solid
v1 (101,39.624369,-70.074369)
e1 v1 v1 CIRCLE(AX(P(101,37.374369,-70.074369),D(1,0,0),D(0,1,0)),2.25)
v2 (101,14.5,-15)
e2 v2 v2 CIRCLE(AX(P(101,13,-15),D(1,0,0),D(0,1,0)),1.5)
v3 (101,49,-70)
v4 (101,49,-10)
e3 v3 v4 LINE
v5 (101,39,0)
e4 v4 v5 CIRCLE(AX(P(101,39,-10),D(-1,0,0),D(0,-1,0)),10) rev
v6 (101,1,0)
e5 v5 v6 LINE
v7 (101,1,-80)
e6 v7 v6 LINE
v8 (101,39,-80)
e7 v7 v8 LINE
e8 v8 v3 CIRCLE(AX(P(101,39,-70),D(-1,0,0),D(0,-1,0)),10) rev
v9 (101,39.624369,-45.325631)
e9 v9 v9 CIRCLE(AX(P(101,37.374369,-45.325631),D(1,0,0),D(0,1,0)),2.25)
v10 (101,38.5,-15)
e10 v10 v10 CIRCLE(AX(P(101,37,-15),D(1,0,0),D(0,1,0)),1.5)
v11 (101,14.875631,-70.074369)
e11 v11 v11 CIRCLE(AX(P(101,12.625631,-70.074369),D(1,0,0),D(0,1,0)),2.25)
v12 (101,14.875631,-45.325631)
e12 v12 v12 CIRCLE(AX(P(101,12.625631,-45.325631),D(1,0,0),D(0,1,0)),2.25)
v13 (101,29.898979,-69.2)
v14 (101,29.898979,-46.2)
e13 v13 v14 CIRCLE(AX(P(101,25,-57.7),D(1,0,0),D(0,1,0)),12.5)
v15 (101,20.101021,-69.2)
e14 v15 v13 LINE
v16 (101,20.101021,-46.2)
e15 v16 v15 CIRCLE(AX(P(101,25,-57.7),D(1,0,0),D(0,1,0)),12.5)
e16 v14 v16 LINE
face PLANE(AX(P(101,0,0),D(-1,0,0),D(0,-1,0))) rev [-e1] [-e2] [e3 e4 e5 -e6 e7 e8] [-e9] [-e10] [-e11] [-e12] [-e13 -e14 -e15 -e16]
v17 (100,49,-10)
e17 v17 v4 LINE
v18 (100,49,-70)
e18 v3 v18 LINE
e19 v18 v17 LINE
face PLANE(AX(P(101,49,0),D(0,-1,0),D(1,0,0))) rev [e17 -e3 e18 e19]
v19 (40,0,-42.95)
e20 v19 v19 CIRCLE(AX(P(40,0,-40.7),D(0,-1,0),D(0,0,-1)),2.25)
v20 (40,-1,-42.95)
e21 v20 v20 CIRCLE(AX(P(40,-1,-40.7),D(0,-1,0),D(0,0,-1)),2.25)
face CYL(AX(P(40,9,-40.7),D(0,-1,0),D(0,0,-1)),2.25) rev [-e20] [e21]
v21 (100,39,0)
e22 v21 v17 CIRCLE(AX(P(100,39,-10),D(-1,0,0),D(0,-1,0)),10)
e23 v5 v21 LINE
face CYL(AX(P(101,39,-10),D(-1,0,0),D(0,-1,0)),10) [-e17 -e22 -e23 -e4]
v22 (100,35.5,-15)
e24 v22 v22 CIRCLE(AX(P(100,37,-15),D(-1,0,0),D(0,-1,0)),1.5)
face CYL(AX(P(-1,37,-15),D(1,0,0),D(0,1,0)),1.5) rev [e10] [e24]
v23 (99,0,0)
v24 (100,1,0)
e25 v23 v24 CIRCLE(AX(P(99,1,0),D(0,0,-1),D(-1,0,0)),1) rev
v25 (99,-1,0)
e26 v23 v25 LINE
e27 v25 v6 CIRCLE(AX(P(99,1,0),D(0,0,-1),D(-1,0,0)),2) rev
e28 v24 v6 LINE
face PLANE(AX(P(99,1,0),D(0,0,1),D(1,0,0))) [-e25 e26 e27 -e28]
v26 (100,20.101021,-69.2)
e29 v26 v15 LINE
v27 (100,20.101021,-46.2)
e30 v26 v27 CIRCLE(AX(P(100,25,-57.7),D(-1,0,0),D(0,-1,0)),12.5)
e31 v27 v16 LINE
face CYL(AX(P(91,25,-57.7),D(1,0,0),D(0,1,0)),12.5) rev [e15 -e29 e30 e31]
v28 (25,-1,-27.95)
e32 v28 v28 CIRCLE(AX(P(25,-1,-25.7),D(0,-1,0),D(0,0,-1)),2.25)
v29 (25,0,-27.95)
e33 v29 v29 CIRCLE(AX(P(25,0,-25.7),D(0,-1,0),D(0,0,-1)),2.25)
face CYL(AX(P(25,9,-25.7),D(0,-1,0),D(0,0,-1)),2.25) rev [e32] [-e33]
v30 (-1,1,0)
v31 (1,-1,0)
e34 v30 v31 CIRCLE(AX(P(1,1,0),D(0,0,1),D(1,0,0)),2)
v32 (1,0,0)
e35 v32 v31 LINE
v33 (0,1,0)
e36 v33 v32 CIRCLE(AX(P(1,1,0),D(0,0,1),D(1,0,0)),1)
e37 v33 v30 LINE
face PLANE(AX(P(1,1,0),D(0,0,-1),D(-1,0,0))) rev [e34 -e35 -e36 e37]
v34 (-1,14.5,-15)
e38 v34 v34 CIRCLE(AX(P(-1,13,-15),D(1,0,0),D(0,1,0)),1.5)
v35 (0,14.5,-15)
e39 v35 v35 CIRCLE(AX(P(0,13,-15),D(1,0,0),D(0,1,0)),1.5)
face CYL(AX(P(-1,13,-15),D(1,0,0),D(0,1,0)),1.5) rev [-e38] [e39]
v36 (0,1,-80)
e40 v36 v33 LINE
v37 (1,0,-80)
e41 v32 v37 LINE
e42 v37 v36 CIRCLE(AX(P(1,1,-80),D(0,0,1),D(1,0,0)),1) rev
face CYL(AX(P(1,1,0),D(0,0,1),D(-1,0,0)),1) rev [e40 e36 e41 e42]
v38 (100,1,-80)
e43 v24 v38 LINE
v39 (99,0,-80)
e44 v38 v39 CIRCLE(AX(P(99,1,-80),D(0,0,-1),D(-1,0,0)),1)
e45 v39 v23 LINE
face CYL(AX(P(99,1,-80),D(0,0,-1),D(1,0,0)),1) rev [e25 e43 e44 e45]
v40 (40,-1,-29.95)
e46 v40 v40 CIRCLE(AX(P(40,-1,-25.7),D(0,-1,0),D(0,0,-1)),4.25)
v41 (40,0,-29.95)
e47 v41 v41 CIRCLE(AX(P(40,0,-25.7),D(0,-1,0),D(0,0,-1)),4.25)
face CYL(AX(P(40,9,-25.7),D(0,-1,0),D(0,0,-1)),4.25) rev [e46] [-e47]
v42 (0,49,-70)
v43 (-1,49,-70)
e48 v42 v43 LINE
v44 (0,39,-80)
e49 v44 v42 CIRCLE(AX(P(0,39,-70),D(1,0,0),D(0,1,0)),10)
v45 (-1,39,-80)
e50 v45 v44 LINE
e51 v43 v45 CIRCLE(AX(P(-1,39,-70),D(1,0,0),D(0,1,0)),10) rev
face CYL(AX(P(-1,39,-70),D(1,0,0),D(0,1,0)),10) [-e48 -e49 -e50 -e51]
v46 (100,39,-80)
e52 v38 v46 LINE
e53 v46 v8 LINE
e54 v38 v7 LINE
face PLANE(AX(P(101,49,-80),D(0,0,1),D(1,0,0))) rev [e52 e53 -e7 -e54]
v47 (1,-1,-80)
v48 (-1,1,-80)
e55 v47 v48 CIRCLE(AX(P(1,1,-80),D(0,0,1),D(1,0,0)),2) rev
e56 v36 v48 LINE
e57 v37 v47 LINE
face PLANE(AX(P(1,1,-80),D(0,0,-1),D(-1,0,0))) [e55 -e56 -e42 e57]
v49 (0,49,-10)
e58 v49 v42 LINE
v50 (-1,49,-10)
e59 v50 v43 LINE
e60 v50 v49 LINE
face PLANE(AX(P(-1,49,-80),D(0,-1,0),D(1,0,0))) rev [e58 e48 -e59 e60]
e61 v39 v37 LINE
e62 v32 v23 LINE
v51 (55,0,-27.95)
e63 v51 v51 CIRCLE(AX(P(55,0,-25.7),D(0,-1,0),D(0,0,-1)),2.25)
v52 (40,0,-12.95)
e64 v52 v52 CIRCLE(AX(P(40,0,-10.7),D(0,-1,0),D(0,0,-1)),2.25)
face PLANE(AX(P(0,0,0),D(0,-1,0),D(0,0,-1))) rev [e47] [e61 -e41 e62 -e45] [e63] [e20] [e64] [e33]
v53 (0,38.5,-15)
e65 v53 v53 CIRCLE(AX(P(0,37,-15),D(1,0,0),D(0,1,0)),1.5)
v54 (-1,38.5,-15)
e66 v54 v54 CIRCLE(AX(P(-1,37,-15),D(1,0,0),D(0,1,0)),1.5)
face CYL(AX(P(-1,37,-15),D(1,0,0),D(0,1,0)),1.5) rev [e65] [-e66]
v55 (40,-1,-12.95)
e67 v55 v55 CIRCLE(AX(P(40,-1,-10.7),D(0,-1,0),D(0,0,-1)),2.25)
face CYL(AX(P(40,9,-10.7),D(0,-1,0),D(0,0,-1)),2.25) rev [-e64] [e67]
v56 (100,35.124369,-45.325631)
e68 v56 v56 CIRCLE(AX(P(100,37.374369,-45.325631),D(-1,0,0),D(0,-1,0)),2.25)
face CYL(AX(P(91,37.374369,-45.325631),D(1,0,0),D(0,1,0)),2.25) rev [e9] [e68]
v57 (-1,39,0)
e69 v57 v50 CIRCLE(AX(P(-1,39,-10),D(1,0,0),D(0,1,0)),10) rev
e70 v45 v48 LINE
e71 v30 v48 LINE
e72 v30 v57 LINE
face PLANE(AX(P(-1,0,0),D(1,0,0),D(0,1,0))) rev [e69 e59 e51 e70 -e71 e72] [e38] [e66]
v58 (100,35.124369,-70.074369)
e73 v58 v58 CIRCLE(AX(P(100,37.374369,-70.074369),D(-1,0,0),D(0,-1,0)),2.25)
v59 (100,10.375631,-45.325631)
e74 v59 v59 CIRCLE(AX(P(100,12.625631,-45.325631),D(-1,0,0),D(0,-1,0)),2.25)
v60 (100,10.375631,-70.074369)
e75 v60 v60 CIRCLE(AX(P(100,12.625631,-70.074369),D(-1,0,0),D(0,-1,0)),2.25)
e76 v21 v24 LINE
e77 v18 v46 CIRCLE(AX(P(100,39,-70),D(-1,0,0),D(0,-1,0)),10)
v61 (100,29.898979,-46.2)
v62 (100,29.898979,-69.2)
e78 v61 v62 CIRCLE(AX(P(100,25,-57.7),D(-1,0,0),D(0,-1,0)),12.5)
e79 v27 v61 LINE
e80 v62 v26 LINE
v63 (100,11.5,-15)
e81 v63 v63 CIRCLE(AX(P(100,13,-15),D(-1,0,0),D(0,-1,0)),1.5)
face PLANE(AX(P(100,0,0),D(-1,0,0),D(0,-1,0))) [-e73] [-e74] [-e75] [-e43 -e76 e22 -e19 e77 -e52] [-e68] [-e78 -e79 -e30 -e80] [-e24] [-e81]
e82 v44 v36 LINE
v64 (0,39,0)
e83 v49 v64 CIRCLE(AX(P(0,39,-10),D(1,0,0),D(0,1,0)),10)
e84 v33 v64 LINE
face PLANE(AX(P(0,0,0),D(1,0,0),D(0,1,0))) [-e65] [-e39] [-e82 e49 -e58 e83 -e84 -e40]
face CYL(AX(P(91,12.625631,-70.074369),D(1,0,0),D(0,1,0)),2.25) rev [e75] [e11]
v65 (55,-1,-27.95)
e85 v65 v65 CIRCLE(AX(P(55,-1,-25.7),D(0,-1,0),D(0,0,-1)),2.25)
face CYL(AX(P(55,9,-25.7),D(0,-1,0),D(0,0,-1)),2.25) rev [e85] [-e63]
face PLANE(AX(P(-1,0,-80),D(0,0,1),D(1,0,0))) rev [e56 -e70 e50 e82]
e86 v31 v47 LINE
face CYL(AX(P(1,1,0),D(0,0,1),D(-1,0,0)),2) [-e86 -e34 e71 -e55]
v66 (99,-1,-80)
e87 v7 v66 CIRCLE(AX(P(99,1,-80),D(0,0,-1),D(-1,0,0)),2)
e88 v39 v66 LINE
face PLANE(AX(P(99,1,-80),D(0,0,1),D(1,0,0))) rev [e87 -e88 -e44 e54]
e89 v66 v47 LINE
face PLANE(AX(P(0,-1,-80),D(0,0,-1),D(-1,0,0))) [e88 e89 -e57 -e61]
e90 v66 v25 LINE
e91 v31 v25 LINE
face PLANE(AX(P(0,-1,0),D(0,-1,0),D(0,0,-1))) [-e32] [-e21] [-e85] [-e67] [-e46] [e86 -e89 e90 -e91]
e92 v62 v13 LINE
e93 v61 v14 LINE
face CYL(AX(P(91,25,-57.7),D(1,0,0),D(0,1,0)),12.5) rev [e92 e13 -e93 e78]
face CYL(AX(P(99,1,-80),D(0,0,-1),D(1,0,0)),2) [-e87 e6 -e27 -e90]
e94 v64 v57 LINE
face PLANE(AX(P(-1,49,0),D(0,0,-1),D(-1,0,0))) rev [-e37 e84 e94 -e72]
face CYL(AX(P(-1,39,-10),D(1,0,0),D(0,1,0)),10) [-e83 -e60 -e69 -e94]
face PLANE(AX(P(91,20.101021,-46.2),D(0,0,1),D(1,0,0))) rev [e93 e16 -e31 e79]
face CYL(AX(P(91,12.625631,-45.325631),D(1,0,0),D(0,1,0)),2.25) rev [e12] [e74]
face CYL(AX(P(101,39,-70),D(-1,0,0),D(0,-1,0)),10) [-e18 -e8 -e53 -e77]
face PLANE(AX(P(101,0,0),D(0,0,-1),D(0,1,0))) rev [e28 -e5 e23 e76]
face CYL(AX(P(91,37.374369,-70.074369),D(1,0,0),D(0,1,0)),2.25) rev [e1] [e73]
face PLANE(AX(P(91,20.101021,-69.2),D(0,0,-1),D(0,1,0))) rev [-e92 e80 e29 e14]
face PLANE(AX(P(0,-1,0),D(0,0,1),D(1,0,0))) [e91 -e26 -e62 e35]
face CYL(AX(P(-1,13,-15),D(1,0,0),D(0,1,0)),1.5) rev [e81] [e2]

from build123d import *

# Parameters (mm, degrees)
SKETCH1_W                    = 100
SKETCH1_H                    = 80
BASE_FLANGE1_DEPTH           = 1
EDGE_FLANGE1_STRIP_W         = 6
EDGE_FLANGE1_STRIP_H         = 1
EDGE_FLANGE1_STRIP_CUT_DEPTH = 80
EDGE_FLANGE1_DEPTH           = 80
EDGE_FLANGE2_STRIP_W         = 6
EDGE_FLANGE2_STRIP_H         = 1
EDGE_FLANGE2_STRIP_CUT_DEPTH = 80
EDGE_FLANGE2_DEPTH           = 80
FILLET1_R                    = 10
SKETCH12_R                   = 2.25
CUT_EXTRUDE1_DEPTH           = 10
SKETCH14_R                   = 4.25
SKETCH14_R_2                 = 2.25
CUT_EXTRUDE3_DEPTH           = 10
SKETCH15_R                   = 1.5
CUT_EXTRUDE4_DEPTH           = 167.440085507


# Sheet-metal steps are written as plain solids
with BuildPart() as part:
    # Sketch1 → Base-Flange1 (new body)
    with BuildSketch(Plane(origin=(0, 0, 0), x_dir=(1, 0, 0), z_dir=(0, 1, 0))):
        with Locations((50, 40)):
            Rectangle(SKETCH1_W, SKETCH1_H)
    extrude(amount=-BASE_FLANGE1_DEPTH)

    # Edge-Flange1 strip (across the edge) → Edge-Flange1 strip cut (cut)
    with BuildSketch(Plane(origin=(100, 0, 0), x_dir=(-1, 0, 0), z_dir=(0, 0, -1))):
        with Locations((-2, -0.5)):
            Rectangle(EDGE_FLANGE1_STRIP_W, EDGE_FLANGE1_STRIP_H)
    extrude(amount=EDGE_FLANGE1_STRIP_CUT_DEPTH, mode=Mode.SUBTRACT)

    # Edge-Flange1 section (across the edge) → Edge-Flange1 (add)
    with BuildSketch(Plane(origin=(100, 0, 0), x_dir=(-1, 0, 0), z_dir=(0, 0, -1))):
        with BuildLine():
            Line((-1, 1), (-1, 49))
            Line((-1, 49), (0, 49))
            Line((0, 49), (0, 1))
            ThreePointArc((0, 1), (0.292893219, 0.292893219), (1, 0))
            Line((1, 0), (1, -1))
            ThreePointArc((1, -1), (-0.414213562, -0.414213562), (-1, 1))
        make_face()
    extrude(amount=EDGE_FLANGE1_DEPTH)

    # Edge-Flange2 strip (across the edge) → Edge-Flange2 strip cut (cut)
    with BuildSketch(Plane.XY.offset(-80)):
        with Locations((-2, -0.5)):
            Rectangle(EDGE_FLANGE2_STRIP_W, EDGE_FLANGE2_STRIP_H)
    extrude(amount=EDGE_FLANGE2_STRIP_CUT_DEPTH, mode=Mode.SUBTRACT)

    # Edge-Flange2 section (across the edge) → Edge-Flange2 (add)
    with BuildSketch(Plane.XY.offset(-80)):
        with BuildLine():
            Line((-1, 1), (-1, 49))
            Line((-1, 49), (0, 49))
            Line((0, 49), (0, 1))
            ThreePointArc((0, 1), (0.292893219, 0.292893219), (1, 0))
            Line((1, 0), (1, -1))
            ThreePointArc((1, -1), (-0.414213562, -0.414213562), (-1, 1))
        make_face()
    extrude(amount=EDGE_FLANGE2_DEPTH)

    # Fillet1
    fillet1_edges = [part.edges().sort_by_distance(p)[0] for p in [
        (100.5, 49, 0),
        (100.5, 49, -80),
        (-0.5, 49, -80),
        (-0.5, 49, 0),
    ]]
    fillet(fillet1_edges, radius=FILLET1_R)

    # Sketch12 → Cut-Extrude1 (cut)
    with BuildSketch(Plane(origin=(101, 81.373526732, -102.532454166), x_dir=(0, 0, 1), z_dir=(1, 0, 0))):
        with BuildLine():
            ThreePointArc((56.332454166, 61.272506218), (44.832454166, 68.873526732), (33.332454166, 61.272506218))
            Line((33.332454166, 61.272506218), (33.332454166, 51.474547246))
            ThreePointArc((33.332454166, 51.474547246), (44.832454166, 43.873526732), (56.332454166, 51.474547246))
            Line((56.332454166, 51.474547246), (56.332454166, 61.272506218))
        make_face()
        with Locations(Location((32.458085495, 68.747895403, 0), (0, 0, 270))):
            Circle(SKETCH12_R)
        with Locations(Location((57.206822836, 68.747895403, 0), (0, 0, 270))):
            Circle(SKETCH12_R)
        with Locations(Location((57.206822836, 43.999158061, 0), (0, 0, 270))):
            Circle(SKETCH12_R)
        with Locations(Location((32.458085495, 43.999158061, 0), (0, 0, 270))):
            Circle(SKETCH12_R)
    extrude(amount=-CUT_EXTRUDE1_DEPTH, mode=Mode.SUBTRACT)

    # Sketch14 → Cut-Extrude3 (cut)
    with BuildSketch(Plane(origin=(82.686654231, -1, -102.532454166), x_dir=(-1, 0, 0), z_dir=(0, -1, 0))):
        with Locations(Location((42.686654231, -76.832454166, 0), (0, 0, 90))):
            Circle(SKETCH14_R)
        with Locations(Location((57.686654231, -76.832454166, 0), (0, 0, 90))):
            Circle(SKETCH14_R_2)
        with Locations(Location((42.686654231, -61.832454166, 0), (0, 0, 90))):
            Circle(SKETCH14_R_2)
        with Locations(Location((27.686654231, -76.832454166, 0), (0, 0, 90))):
            Circle(SKETCH14_R_2)
        with Locations(Location((42.686654231, -91.832454166, 0), (0, 0, 90))):
            Circle(SKETCH14_R_2)
    extrude(amount=-CUT_EXTRUDE3_DEPTH, mode=Mode.SUBTRACT)

    # Sketch15 → Cut-Extrude4 (cut, through all)
    with BuildSketch(Plane(origin=(101, 81.373526732, -102.532454166), x_dir=(0, 0, 1), z_dir=(1, 0, 0))):
        with Locations(Location((87.532454166, 44.373526732, 0), (0, 0, 270))):
            Circle(SKETCH15_R)
        with Locations(Location((87.532454166, 68.373526732, 0), (0, 0, 270))):
            Circle(SKETCH15_R)
    extrude(amount=-CUT_EXTRUDE4_DEPTH, mode=Mode.SUBTRACT)


solid = part.part
